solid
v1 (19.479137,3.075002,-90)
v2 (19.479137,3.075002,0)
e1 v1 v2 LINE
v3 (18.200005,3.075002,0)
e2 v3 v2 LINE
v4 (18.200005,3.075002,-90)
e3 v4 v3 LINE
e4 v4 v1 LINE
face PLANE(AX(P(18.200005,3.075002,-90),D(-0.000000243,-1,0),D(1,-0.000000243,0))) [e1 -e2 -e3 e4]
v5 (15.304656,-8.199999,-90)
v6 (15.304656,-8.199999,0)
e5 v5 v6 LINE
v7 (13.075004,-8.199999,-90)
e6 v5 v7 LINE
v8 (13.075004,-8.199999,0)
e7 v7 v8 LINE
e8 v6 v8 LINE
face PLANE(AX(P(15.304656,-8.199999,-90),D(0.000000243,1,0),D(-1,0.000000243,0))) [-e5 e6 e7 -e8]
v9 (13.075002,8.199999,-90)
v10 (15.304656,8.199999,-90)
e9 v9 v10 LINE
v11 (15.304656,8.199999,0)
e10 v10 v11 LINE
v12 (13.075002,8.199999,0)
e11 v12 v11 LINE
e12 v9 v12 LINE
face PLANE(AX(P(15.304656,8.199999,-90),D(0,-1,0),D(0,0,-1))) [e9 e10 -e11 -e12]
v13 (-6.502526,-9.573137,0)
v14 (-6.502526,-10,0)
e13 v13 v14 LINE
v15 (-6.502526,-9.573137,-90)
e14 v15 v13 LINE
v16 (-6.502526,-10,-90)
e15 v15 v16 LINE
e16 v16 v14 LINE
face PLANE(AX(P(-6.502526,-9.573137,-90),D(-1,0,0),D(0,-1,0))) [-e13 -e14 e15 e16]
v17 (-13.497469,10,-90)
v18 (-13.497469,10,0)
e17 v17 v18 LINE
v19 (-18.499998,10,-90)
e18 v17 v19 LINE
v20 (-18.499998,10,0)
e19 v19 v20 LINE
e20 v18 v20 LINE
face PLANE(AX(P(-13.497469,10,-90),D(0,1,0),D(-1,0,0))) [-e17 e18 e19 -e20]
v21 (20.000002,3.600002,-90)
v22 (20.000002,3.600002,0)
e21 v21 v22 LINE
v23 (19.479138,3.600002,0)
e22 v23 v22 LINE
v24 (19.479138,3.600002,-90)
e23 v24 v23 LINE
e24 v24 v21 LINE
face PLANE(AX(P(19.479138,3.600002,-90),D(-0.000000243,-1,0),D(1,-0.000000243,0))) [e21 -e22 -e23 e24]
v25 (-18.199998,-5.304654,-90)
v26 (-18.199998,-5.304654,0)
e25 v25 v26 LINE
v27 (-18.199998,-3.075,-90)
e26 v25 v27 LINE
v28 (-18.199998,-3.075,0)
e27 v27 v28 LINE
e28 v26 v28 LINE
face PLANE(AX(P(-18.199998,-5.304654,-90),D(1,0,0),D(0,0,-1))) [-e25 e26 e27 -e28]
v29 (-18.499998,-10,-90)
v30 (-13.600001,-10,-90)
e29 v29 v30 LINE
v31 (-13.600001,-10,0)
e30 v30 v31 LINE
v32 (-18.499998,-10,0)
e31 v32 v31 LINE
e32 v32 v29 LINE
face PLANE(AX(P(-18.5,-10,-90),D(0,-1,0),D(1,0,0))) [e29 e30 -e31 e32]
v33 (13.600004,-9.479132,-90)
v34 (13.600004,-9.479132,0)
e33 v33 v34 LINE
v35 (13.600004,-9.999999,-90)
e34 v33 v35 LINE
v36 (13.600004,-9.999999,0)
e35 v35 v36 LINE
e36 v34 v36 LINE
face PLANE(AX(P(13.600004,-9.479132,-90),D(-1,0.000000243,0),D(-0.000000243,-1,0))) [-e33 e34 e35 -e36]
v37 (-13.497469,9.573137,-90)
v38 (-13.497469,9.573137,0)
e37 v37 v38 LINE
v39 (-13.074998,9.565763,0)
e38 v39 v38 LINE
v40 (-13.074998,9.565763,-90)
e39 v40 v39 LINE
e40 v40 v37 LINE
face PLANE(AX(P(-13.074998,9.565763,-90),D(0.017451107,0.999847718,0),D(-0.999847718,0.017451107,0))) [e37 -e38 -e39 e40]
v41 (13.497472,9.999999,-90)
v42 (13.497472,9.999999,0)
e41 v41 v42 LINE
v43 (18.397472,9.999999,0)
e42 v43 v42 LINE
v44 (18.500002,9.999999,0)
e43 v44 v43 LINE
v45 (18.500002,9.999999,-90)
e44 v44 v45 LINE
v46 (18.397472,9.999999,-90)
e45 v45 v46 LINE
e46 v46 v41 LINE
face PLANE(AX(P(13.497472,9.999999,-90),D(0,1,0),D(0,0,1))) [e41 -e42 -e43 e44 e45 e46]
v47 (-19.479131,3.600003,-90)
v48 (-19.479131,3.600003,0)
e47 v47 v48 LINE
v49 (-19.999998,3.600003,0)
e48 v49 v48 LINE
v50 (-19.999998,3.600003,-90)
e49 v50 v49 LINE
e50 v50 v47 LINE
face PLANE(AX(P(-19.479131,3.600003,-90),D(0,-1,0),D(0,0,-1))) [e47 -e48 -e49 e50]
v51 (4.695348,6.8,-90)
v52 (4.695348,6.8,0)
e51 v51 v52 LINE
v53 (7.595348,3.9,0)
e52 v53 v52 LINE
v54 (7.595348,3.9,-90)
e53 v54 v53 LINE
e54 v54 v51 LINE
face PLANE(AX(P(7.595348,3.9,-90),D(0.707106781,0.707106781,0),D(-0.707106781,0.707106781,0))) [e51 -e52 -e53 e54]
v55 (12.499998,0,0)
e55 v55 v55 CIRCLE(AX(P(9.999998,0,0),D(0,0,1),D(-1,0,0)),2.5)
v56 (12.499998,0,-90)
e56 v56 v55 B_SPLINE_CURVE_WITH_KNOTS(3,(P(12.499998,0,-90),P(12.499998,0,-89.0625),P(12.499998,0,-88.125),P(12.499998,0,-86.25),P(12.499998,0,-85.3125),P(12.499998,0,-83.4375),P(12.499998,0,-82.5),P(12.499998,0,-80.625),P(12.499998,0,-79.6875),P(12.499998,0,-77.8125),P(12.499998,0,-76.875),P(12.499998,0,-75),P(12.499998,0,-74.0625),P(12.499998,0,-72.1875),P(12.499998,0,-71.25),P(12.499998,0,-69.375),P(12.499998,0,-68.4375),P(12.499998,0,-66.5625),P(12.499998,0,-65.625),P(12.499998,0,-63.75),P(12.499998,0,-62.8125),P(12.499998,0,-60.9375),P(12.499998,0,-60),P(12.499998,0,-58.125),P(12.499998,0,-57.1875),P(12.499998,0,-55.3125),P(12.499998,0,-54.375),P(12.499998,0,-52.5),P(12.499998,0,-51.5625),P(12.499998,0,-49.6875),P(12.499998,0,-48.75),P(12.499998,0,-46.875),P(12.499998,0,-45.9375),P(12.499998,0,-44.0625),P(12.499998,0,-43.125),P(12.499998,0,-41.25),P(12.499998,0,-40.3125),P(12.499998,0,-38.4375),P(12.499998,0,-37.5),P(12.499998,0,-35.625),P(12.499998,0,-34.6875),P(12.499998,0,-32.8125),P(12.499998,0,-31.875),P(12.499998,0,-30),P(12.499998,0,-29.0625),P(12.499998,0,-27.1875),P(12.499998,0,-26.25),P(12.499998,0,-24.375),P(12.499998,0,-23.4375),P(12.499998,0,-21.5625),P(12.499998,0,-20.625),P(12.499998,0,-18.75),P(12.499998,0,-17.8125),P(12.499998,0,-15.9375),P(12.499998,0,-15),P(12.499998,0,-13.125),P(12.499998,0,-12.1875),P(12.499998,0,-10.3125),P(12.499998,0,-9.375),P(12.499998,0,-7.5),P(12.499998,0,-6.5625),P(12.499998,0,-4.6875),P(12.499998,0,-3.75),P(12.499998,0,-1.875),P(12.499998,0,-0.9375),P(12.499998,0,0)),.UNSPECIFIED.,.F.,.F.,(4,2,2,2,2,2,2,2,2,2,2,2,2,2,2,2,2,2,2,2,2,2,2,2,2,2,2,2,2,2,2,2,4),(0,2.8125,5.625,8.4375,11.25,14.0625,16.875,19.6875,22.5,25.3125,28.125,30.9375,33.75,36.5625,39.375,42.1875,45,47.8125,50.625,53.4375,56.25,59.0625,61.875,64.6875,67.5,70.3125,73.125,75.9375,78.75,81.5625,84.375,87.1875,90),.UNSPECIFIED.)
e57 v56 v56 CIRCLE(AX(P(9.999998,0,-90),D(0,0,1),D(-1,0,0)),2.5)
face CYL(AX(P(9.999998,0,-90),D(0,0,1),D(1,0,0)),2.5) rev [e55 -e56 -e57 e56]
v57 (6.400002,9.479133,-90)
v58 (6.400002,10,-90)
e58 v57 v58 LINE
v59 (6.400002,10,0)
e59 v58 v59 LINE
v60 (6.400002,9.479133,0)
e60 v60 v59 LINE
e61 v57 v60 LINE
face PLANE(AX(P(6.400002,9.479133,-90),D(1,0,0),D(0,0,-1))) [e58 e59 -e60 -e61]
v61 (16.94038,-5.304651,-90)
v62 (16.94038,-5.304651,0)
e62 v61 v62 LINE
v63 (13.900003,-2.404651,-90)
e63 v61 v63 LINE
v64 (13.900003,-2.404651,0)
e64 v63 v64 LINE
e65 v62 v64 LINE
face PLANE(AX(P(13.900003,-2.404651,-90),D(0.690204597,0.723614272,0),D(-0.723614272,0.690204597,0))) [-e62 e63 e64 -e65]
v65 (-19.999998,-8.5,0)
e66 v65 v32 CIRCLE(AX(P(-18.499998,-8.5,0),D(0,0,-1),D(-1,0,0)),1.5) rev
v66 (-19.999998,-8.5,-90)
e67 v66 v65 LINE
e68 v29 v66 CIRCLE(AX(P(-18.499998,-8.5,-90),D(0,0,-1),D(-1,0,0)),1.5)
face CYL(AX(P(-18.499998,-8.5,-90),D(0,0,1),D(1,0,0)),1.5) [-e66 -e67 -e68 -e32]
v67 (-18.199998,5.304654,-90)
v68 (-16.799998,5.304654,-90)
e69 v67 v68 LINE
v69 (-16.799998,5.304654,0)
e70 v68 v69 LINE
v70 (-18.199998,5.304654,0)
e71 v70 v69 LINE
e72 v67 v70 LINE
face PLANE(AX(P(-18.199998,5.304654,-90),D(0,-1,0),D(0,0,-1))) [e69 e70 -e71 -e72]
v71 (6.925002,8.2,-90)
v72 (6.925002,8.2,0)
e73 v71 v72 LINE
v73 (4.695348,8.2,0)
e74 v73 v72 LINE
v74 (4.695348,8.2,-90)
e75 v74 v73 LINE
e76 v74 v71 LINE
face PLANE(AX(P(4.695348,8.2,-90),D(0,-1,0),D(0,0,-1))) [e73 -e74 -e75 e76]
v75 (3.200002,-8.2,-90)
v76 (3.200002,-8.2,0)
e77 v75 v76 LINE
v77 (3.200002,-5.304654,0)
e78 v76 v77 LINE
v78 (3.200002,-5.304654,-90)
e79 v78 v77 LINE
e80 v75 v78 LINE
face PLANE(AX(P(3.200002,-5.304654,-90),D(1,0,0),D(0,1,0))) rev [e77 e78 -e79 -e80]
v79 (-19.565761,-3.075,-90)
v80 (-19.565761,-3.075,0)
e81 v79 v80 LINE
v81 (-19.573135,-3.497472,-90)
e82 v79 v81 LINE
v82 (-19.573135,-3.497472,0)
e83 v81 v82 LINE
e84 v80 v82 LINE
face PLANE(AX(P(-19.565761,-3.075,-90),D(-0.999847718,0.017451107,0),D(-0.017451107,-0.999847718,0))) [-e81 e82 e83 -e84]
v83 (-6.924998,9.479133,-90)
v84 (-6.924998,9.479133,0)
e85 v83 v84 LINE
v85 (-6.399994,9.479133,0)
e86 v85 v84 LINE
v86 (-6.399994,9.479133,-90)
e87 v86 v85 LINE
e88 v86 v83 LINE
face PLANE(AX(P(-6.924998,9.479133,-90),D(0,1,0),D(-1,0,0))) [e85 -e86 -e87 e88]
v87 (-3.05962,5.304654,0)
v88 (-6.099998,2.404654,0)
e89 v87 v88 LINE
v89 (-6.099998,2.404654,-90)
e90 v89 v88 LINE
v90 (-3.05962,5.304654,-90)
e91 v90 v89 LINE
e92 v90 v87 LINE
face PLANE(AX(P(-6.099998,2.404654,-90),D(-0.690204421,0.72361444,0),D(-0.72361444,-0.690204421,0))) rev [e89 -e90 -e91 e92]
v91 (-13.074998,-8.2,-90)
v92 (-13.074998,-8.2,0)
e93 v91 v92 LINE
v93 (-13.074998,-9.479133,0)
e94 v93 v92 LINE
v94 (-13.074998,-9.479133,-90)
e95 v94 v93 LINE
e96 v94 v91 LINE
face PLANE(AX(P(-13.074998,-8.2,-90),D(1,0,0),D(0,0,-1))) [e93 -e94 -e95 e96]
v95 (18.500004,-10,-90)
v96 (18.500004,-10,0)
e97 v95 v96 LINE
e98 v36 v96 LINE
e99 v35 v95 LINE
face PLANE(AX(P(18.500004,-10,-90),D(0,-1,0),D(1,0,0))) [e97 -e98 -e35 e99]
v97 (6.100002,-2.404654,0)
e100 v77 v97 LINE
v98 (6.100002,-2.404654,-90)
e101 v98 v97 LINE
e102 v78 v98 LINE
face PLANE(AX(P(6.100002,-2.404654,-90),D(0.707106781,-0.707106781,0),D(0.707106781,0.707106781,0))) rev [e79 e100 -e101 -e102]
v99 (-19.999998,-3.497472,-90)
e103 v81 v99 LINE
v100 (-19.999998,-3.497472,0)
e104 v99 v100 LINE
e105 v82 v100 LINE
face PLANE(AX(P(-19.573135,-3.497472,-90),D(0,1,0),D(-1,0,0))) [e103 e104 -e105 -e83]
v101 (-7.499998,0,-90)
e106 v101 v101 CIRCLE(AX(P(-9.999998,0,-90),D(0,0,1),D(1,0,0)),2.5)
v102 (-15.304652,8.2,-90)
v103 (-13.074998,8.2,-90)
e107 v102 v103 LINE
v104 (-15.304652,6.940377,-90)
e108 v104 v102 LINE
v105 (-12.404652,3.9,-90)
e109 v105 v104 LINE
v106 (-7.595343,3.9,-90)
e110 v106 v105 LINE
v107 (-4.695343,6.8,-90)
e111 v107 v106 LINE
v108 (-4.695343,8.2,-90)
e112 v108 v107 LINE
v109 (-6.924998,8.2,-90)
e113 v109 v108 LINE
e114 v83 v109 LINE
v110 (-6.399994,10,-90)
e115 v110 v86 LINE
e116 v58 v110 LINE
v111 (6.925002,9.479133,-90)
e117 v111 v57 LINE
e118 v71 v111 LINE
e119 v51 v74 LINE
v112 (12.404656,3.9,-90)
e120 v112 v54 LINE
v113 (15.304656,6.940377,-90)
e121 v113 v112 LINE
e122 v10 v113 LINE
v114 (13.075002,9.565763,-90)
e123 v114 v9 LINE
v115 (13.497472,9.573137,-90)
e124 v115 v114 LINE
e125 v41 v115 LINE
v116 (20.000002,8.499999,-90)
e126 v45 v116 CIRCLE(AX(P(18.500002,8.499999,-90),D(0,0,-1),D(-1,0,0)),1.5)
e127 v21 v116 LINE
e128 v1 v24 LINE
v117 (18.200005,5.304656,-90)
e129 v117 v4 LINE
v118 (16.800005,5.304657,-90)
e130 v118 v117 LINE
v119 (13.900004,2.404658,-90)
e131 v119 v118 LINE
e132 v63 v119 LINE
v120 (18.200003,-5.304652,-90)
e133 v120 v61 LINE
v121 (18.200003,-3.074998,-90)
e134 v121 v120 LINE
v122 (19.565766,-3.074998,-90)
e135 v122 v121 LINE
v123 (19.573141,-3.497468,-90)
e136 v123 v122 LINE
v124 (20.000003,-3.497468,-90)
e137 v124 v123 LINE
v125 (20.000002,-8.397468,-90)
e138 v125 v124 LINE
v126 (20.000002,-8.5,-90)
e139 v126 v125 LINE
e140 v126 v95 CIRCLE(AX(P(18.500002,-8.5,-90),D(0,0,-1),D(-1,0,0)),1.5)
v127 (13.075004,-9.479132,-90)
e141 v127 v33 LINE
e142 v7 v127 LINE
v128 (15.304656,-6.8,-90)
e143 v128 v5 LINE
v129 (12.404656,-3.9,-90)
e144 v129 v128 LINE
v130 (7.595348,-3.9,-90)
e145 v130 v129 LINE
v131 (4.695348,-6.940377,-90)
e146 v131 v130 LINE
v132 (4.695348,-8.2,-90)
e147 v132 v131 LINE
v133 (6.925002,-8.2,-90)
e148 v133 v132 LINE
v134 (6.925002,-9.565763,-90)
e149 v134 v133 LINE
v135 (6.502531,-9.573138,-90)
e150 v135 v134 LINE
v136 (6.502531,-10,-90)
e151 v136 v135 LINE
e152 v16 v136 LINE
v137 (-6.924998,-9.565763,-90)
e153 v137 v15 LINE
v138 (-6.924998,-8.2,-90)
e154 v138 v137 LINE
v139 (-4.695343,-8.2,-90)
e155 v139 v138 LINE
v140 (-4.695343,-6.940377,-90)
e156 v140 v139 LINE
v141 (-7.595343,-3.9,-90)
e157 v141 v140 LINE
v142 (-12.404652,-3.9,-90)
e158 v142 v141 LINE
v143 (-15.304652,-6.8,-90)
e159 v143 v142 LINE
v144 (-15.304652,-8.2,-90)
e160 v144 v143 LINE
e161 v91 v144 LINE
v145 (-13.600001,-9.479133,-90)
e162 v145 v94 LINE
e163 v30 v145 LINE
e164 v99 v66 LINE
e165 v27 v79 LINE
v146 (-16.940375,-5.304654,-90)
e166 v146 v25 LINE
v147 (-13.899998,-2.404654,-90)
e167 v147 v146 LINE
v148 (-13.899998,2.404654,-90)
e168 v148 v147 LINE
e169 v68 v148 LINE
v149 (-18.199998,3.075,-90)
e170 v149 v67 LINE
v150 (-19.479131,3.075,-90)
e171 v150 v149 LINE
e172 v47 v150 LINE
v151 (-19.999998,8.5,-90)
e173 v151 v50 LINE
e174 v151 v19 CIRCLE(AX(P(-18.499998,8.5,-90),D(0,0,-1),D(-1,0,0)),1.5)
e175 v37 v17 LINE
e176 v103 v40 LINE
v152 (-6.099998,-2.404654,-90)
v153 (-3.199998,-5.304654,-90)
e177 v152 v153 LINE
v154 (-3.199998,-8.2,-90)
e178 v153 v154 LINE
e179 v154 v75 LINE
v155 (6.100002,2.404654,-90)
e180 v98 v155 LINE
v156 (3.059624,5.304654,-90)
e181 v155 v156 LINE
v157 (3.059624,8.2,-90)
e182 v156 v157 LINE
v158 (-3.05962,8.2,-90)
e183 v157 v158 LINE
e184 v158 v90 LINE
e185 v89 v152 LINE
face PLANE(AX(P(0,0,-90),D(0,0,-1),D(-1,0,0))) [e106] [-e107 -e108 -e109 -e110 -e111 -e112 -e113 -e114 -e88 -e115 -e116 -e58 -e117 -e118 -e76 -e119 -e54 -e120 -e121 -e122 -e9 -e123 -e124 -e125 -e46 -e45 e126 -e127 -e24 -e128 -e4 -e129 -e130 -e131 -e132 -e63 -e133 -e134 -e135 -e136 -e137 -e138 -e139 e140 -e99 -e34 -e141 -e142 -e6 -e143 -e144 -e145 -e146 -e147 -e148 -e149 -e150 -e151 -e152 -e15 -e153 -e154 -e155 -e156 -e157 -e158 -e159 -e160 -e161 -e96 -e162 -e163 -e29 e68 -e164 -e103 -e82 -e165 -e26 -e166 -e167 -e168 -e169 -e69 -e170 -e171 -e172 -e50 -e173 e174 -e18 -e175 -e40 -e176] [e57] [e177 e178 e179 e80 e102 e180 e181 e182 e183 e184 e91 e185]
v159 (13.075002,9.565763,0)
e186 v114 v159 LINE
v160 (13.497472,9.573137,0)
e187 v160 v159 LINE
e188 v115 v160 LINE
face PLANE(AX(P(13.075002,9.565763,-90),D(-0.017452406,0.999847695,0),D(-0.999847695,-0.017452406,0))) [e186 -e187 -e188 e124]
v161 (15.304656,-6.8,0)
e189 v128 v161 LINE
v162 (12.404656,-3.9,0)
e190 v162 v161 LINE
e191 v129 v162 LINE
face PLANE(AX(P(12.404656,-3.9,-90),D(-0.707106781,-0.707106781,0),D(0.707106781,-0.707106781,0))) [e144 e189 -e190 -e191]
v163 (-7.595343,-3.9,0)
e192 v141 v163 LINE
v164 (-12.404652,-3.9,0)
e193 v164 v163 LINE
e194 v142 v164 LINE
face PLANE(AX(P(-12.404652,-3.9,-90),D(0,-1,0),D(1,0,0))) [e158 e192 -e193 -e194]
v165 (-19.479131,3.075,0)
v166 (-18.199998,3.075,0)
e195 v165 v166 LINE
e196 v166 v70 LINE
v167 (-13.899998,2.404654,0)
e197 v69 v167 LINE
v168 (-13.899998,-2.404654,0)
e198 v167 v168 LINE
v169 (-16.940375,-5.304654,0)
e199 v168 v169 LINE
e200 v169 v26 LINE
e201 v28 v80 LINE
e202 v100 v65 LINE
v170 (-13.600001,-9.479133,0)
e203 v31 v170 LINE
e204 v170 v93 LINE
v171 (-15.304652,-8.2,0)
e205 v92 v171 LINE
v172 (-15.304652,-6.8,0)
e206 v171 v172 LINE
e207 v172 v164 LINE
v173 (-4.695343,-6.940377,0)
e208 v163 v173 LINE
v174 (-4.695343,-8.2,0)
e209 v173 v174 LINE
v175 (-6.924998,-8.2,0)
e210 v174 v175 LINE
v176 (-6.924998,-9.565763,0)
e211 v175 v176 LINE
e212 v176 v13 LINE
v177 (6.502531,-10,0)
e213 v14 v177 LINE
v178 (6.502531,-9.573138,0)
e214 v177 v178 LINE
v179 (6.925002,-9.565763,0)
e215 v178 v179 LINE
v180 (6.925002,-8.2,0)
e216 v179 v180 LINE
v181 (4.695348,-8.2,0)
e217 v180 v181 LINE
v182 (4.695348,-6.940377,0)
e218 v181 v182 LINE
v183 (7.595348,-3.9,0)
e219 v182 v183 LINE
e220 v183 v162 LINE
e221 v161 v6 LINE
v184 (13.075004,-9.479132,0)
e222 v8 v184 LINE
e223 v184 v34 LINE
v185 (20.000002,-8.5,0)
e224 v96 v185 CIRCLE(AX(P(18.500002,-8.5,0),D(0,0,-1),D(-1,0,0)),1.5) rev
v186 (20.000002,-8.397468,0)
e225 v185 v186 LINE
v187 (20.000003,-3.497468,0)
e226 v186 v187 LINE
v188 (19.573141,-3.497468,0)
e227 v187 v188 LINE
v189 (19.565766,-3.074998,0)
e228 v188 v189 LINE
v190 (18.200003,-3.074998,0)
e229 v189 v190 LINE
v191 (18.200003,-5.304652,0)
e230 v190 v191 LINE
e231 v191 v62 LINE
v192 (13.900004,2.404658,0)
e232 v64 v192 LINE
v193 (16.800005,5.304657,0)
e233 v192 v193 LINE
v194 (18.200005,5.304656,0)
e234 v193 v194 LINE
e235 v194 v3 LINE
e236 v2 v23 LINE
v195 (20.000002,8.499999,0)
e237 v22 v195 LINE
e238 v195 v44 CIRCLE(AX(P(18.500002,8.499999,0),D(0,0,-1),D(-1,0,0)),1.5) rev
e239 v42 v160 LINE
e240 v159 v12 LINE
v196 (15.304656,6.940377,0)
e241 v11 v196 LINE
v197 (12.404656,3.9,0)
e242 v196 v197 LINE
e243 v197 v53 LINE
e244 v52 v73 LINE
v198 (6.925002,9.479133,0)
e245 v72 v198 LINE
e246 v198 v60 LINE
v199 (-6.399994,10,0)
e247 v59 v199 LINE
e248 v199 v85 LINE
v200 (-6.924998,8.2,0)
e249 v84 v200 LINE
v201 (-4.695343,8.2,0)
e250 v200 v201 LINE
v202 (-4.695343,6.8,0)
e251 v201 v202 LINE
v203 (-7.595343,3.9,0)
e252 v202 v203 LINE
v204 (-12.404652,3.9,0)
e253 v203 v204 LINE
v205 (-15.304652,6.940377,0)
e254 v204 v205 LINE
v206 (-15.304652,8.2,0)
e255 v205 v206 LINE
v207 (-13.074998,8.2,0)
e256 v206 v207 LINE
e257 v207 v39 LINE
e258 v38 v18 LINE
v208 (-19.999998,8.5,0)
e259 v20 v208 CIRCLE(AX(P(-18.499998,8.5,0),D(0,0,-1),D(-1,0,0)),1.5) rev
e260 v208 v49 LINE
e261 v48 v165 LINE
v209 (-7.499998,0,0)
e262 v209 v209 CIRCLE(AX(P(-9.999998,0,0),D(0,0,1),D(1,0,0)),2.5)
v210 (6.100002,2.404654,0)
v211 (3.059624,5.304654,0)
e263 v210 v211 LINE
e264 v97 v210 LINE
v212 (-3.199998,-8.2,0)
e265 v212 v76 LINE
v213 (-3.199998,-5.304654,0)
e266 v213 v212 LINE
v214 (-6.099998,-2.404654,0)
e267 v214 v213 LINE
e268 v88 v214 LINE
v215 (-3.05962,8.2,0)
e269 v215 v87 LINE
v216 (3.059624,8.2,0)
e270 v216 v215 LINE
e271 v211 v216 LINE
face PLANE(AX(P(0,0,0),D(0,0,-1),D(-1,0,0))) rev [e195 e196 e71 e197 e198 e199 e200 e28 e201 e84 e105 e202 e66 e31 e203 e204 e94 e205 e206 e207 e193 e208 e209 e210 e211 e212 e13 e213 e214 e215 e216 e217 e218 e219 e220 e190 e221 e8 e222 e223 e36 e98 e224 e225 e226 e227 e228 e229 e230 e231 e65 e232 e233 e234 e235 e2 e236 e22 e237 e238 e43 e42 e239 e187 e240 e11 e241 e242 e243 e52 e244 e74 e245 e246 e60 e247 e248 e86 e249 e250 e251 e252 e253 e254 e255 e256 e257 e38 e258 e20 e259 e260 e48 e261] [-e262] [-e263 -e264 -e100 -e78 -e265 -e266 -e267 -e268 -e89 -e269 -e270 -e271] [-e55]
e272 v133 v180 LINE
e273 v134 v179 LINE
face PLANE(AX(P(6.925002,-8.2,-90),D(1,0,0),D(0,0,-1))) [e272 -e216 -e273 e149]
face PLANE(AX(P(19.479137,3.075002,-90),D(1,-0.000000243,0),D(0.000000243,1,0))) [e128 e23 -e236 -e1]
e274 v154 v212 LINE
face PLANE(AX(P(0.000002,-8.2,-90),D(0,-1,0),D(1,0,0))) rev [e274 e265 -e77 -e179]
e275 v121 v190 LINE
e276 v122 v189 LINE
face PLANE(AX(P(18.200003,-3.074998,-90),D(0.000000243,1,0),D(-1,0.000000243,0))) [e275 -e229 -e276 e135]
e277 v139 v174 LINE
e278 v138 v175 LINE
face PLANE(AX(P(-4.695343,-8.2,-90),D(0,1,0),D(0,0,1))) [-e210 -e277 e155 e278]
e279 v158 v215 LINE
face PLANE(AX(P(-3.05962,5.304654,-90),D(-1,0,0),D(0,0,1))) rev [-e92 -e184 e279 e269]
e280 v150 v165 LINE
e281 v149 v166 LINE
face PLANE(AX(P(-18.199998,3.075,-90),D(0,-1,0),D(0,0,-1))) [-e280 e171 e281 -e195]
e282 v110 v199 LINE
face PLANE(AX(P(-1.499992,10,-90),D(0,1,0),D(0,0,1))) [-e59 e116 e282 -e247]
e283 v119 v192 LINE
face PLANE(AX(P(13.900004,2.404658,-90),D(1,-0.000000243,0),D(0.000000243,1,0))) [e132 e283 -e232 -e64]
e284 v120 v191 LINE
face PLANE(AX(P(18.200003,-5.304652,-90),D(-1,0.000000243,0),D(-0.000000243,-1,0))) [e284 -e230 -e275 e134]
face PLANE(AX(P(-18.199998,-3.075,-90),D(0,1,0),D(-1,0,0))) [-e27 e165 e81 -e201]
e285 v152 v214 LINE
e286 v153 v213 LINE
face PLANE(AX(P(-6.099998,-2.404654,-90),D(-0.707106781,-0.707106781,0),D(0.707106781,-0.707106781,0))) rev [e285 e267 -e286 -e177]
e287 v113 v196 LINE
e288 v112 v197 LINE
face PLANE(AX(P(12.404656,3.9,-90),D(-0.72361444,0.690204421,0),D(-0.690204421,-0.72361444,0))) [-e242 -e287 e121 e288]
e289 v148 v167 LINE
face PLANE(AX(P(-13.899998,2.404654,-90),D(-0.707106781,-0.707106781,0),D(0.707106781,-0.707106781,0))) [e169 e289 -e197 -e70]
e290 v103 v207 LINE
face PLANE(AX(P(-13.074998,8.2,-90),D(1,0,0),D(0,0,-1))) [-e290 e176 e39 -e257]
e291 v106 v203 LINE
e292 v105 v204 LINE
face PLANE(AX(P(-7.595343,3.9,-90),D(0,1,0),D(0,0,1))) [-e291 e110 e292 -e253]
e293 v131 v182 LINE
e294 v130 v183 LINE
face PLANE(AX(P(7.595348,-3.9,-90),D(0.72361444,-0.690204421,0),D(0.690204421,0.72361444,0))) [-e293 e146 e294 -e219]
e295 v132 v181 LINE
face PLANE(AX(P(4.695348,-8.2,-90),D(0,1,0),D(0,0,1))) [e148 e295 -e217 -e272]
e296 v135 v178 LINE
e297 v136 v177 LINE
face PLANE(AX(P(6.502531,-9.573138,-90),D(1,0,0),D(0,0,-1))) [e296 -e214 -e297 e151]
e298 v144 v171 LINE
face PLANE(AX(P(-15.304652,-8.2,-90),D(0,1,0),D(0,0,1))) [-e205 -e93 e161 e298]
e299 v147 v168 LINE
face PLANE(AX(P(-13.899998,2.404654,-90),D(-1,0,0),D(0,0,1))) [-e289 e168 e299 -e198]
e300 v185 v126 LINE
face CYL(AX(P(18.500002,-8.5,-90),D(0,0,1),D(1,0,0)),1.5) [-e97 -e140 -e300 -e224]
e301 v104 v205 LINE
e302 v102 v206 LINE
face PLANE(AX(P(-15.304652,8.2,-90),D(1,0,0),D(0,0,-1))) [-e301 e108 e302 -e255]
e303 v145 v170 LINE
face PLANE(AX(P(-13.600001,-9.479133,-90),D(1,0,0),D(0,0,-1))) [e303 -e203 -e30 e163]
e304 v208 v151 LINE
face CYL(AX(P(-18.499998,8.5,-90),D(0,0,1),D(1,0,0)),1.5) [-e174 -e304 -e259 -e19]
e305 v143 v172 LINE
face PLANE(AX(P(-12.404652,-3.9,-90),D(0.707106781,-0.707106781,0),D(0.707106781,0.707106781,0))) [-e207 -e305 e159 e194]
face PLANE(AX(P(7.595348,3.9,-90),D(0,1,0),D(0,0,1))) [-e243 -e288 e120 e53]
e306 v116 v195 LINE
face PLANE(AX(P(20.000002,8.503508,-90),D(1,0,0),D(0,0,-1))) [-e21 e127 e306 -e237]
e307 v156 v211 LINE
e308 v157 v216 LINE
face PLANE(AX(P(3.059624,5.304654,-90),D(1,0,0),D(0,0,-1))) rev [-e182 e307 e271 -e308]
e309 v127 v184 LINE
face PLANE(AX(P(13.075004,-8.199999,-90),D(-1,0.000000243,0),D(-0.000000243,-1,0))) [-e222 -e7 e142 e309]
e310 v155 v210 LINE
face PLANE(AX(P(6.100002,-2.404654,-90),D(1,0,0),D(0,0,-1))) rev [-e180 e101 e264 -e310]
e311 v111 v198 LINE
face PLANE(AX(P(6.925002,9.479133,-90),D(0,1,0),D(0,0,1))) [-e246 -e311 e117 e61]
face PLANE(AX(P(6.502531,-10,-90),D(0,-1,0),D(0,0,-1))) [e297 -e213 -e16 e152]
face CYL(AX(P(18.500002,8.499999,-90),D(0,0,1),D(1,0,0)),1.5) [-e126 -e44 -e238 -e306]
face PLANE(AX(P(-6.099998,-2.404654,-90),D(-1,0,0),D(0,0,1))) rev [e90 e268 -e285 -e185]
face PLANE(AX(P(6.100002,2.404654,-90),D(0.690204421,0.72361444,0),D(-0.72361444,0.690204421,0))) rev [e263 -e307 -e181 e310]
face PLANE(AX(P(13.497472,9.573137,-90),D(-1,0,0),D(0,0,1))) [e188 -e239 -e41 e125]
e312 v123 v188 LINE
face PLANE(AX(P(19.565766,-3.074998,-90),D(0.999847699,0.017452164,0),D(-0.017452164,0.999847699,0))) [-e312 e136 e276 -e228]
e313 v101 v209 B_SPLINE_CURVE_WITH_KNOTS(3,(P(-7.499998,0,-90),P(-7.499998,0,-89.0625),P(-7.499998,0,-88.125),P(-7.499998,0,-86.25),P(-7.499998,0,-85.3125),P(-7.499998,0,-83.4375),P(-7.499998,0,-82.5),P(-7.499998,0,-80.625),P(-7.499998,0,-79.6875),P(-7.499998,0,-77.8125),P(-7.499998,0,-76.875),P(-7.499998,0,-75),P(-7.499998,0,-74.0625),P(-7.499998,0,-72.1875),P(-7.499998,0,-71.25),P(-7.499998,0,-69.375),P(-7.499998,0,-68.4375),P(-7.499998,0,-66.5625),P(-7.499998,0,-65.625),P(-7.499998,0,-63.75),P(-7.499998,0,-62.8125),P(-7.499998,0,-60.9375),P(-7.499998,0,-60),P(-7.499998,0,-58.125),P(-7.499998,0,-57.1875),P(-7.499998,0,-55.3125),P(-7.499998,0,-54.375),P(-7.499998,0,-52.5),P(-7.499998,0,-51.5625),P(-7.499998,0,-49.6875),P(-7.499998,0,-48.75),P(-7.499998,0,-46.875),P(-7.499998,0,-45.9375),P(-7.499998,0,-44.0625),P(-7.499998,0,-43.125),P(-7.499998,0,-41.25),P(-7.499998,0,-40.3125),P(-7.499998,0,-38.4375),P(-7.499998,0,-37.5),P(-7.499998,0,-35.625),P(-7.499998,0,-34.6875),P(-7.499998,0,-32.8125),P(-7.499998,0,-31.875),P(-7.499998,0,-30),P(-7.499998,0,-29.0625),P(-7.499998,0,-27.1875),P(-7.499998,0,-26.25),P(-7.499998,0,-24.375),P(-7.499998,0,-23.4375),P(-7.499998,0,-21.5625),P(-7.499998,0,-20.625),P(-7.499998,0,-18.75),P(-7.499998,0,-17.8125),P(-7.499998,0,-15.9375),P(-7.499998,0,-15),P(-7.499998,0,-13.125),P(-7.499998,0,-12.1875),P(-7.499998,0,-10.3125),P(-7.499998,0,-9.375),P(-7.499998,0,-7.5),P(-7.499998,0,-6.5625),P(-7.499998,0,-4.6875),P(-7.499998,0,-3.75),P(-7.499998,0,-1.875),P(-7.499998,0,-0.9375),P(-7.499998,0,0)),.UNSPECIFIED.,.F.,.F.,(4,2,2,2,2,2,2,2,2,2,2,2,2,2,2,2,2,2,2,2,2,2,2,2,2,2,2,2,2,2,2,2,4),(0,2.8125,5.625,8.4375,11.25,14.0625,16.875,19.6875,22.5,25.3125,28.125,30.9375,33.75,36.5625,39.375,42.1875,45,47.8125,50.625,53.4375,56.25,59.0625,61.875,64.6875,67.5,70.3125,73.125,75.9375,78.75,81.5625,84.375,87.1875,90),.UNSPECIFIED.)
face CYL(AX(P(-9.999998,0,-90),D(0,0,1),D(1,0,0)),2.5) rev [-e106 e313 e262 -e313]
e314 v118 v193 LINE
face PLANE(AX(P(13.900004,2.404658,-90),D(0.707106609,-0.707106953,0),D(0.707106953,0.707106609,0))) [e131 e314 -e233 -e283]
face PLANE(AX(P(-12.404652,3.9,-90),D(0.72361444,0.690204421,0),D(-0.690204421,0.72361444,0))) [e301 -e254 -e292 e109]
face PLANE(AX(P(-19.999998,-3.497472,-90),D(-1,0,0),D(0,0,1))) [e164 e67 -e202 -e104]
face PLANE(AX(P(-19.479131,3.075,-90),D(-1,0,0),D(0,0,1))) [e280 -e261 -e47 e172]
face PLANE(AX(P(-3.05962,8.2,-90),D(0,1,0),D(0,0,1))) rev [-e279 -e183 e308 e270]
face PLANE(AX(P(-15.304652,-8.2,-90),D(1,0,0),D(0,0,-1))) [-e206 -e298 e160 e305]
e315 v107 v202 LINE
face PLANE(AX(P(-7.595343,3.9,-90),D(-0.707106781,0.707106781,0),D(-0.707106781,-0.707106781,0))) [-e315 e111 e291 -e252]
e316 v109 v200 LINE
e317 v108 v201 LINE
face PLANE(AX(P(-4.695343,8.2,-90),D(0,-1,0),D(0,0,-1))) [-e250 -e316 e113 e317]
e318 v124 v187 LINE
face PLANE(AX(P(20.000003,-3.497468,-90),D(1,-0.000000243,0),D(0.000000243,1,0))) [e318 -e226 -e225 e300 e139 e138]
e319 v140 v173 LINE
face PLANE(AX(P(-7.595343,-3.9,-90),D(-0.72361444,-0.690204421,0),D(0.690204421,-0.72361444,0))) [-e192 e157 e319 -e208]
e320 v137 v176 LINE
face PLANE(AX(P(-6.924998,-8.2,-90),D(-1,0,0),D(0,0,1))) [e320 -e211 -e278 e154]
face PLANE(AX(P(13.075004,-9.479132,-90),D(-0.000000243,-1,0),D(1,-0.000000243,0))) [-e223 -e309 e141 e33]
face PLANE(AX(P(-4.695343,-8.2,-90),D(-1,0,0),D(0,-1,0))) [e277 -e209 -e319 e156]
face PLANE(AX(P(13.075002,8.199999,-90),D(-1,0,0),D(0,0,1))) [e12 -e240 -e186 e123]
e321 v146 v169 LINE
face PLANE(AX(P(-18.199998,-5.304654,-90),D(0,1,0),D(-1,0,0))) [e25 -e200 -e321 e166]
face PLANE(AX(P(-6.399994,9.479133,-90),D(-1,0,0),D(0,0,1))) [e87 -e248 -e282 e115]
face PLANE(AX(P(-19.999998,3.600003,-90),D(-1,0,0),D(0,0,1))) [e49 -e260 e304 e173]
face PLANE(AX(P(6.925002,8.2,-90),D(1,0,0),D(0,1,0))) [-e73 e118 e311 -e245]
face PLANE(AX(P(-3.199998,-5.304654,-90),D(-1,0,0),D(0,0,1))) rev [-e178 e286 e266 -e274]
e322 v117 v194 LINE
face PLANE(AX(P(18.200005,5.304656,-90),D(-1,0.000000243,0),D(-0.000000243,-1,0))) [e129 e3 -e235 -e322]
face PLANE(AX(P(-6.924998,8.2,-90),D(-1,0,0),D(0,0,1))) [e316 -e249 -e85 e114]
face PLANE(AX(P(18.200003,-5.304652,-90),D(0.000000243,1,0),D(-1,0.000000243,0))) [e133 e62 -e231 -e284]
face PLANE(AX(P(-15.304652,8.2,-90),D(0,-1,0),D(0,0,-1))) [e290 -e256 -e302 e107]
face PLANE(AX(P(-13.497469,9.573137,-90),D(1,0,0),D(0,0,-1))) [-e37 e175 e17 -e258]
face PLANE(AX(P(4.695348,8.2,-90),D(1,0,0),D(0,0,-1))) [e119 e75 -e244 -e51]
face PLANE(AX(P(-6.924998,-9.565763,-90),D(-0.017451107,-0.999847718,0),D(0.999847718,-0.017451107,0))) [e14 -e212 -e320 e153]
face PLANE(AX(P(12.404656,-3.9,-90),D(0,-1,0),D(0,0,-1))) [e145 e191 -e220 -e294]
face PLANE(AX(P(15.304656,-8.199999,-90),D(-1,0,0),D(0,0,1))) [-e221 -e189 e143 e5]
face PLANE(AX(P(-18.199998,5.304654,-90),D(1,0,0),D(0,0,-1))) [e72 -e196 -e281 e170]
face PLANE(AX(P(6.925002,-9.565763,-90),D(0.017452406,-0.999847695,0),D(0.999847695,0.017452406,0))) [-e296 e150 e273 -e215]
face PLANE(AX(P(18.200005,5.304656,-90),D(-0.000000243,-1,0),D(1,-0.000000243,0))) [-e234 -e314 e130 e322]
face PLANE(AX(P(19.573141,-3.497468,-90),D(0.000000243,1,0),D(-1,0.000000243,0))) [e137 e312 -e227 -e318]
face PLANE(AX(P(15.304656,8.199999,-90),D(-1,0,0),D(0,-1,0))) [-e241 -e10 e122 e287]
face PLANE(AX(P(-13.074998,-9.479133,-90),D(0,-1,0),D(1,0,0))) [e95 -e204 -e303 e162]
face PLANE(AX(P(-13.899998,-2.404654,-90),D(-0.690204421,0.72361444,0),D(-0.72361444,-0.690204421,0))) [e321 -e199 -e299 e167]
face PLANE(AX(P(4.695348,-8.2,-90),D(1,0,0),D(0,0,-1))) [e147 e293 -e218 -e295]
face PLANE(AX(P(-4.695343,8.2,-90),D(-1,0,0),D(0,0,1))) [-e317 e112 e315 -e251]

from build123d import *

# Parameters (mm, degrees)
SKETCH1_R           = 2.5
BOSS_EXTRUDE1_DEPTH = 90
FILLET1_R           = 1.5


with BuildPart() as part:
    # Sketch1 → Boss-Extrude1 (new body)
    with BuildSketch(Plane.XY):
        Polygon((-1.499992211, 10), (2.38e-06, 10), (1.500001785, 10), (6.400001785, 10), (6.400001785, 9.479132912), (6.925001785, 9.479132912), (6.925001785, 8.2), (4.695347664, 8.2), (4.695347664, 6.8), (7.595347664, 3.9), (12.404655907, 3.9), (15.304655907, 6.94037733), (15.304655907, 8.199999348), (13.075001785, 8.199999348), (13.075001785, 9.565762703), (13.497472172, 9.573136951), (13.497472172, 9.999999348), (18.397472172, 9.999999348), (20.000001785, 10), (20.000001785, 8.503508491), (20.000001785, 8.500000005), (20.000001785, 3.600001911), (19.479137611, 3.600002038), (19.479137484, 3.075002038), (18.200004571, 3.075002348), (18.200005113, 5.30465647), (16.800005113, 5.30465681), (13.900004408, 2.404657514), (13.900003241, -2.404650729), (16.940379867, -5.304651467), (18.200002536, -5.304651773), (18.200003078, -3.074997652), (19.565766433, -3.074997983), (19.573140578, -3.497468372), (20.000002975, -3.497468476), (20.000001785, -8.397468476), (20.000001785, -10), (18.500003987, -10), (13.600003987, -9.99999881), (13.600004114, -9.479131722), (13.075004114, -9.479131595), (13.075004424, -8.199998683), (15.304655907, -8.199999224), (15.304655907, -6.8), (12.404655907, -3.9), (7.595347664, -3.9), (4.695347664, -6.94037733), (4.695347664, -8.2), (6.925001785, -8.2), (6.925001785, -9.565763355), (6.502531399, -9.573137603), (6.502531399, -10), (1.602531399, -10), (2.38e-06, -10), (-1.602527233, -10), (-6.502525798, -10), (-6.502525798, -9.573137078), (-6.92499762, -9.565763355), (-6.92499762, -8.2), (-4.695343498, -8.2), (-4.695343498, -6.94037733), (-7.595343498, -3.9), (-12.404651741, -3.9), (-15.304651741, -6.8), (-15.304651741, -8.2), (-13.07499762, -8.2), (-13.07499762, -9.479132912), (-13.600001017, -9.479132912), (-13.600001017, -10), (-18.49999954, -10), (-19.99999762, -10), (-19.99999762, -3.497471822), (-19.573134698, -3.497471822), (-19.565760974, -3.075), (-18.19999762, -3.075), (-18.19999762, -5.304654122), (-16.94037495, -5.304654122), (-13.89999762, -2.404654122), (-13.89999762, 2.404654122), (-16.79999762, 5.304654122), (-18.19999762, 5.304654122), (-18.19999762, 3.075), (-19.479130532, 3.075), (-19.479130532, 3.600003398), (-19.99999762, 3.600003398), (-19.99999762, 10), (-13.497469442, 10), (-13.497469442, 9.573137078), (-13.07499762, 9.565763355), (-13.07499762, 8.2), (-15.304651741, 8.2), (-15.304651741, 6.94037733), (-12.404651741, 3.9), (-7.595343498, 3.9), (-4.695343498, 6.8), (-4.695343498, 8.2), (-6.92499762, 8.2), (-6.92499762, 9.479132912), (-6.399994222, 9.479132912), (-6.399994222, 10), align=None)
        with Locations((-9.99999762, 0)):
            Circle(SKETCH1_R, mode=Mode.SUBTRACT)
        with Locations((9.99999762, 0)):
            Circle(SKETCH1_R, mode=Mode.SUBTRACT)
        Polygon((-3.059620289, 5.304654122), (-3.059620289, 8.2), (2.38e-06, 8.2), (3.059624455, 8.2), (3.059624455, 5.304654122), (6.100001785, 2.404654122), (6.100001785, -2.404654122), (3.200001785, -5.304654122), (3.200001785, -8.2), (2.38e-06, -8.2), (-3.19999762, -8.2), (-3.19999762, -5.304654122), (-6.09999762, -2.404654122), (-6.09999762, 2.404654122), align=None, mode=Mode.SUBTRACT)
    extrude(amount=-BOSS_EXTRUDE1_DEPTH)

    # Fillet1
    fillet1_edges = [part.edges().sort_by_distance(p)[0] for p in [
        (20.000001785, 10, -45),
        (20.000001785, -10, -45),
        (-19.99999762, -10, -45),
        (-19.99999762, 10, -45),
    ]]
    fillet(fillet1_edges, radius=FILLET1_R - 0.0001)  # a hair under: the kernel refuses the full size


solid = part.part
